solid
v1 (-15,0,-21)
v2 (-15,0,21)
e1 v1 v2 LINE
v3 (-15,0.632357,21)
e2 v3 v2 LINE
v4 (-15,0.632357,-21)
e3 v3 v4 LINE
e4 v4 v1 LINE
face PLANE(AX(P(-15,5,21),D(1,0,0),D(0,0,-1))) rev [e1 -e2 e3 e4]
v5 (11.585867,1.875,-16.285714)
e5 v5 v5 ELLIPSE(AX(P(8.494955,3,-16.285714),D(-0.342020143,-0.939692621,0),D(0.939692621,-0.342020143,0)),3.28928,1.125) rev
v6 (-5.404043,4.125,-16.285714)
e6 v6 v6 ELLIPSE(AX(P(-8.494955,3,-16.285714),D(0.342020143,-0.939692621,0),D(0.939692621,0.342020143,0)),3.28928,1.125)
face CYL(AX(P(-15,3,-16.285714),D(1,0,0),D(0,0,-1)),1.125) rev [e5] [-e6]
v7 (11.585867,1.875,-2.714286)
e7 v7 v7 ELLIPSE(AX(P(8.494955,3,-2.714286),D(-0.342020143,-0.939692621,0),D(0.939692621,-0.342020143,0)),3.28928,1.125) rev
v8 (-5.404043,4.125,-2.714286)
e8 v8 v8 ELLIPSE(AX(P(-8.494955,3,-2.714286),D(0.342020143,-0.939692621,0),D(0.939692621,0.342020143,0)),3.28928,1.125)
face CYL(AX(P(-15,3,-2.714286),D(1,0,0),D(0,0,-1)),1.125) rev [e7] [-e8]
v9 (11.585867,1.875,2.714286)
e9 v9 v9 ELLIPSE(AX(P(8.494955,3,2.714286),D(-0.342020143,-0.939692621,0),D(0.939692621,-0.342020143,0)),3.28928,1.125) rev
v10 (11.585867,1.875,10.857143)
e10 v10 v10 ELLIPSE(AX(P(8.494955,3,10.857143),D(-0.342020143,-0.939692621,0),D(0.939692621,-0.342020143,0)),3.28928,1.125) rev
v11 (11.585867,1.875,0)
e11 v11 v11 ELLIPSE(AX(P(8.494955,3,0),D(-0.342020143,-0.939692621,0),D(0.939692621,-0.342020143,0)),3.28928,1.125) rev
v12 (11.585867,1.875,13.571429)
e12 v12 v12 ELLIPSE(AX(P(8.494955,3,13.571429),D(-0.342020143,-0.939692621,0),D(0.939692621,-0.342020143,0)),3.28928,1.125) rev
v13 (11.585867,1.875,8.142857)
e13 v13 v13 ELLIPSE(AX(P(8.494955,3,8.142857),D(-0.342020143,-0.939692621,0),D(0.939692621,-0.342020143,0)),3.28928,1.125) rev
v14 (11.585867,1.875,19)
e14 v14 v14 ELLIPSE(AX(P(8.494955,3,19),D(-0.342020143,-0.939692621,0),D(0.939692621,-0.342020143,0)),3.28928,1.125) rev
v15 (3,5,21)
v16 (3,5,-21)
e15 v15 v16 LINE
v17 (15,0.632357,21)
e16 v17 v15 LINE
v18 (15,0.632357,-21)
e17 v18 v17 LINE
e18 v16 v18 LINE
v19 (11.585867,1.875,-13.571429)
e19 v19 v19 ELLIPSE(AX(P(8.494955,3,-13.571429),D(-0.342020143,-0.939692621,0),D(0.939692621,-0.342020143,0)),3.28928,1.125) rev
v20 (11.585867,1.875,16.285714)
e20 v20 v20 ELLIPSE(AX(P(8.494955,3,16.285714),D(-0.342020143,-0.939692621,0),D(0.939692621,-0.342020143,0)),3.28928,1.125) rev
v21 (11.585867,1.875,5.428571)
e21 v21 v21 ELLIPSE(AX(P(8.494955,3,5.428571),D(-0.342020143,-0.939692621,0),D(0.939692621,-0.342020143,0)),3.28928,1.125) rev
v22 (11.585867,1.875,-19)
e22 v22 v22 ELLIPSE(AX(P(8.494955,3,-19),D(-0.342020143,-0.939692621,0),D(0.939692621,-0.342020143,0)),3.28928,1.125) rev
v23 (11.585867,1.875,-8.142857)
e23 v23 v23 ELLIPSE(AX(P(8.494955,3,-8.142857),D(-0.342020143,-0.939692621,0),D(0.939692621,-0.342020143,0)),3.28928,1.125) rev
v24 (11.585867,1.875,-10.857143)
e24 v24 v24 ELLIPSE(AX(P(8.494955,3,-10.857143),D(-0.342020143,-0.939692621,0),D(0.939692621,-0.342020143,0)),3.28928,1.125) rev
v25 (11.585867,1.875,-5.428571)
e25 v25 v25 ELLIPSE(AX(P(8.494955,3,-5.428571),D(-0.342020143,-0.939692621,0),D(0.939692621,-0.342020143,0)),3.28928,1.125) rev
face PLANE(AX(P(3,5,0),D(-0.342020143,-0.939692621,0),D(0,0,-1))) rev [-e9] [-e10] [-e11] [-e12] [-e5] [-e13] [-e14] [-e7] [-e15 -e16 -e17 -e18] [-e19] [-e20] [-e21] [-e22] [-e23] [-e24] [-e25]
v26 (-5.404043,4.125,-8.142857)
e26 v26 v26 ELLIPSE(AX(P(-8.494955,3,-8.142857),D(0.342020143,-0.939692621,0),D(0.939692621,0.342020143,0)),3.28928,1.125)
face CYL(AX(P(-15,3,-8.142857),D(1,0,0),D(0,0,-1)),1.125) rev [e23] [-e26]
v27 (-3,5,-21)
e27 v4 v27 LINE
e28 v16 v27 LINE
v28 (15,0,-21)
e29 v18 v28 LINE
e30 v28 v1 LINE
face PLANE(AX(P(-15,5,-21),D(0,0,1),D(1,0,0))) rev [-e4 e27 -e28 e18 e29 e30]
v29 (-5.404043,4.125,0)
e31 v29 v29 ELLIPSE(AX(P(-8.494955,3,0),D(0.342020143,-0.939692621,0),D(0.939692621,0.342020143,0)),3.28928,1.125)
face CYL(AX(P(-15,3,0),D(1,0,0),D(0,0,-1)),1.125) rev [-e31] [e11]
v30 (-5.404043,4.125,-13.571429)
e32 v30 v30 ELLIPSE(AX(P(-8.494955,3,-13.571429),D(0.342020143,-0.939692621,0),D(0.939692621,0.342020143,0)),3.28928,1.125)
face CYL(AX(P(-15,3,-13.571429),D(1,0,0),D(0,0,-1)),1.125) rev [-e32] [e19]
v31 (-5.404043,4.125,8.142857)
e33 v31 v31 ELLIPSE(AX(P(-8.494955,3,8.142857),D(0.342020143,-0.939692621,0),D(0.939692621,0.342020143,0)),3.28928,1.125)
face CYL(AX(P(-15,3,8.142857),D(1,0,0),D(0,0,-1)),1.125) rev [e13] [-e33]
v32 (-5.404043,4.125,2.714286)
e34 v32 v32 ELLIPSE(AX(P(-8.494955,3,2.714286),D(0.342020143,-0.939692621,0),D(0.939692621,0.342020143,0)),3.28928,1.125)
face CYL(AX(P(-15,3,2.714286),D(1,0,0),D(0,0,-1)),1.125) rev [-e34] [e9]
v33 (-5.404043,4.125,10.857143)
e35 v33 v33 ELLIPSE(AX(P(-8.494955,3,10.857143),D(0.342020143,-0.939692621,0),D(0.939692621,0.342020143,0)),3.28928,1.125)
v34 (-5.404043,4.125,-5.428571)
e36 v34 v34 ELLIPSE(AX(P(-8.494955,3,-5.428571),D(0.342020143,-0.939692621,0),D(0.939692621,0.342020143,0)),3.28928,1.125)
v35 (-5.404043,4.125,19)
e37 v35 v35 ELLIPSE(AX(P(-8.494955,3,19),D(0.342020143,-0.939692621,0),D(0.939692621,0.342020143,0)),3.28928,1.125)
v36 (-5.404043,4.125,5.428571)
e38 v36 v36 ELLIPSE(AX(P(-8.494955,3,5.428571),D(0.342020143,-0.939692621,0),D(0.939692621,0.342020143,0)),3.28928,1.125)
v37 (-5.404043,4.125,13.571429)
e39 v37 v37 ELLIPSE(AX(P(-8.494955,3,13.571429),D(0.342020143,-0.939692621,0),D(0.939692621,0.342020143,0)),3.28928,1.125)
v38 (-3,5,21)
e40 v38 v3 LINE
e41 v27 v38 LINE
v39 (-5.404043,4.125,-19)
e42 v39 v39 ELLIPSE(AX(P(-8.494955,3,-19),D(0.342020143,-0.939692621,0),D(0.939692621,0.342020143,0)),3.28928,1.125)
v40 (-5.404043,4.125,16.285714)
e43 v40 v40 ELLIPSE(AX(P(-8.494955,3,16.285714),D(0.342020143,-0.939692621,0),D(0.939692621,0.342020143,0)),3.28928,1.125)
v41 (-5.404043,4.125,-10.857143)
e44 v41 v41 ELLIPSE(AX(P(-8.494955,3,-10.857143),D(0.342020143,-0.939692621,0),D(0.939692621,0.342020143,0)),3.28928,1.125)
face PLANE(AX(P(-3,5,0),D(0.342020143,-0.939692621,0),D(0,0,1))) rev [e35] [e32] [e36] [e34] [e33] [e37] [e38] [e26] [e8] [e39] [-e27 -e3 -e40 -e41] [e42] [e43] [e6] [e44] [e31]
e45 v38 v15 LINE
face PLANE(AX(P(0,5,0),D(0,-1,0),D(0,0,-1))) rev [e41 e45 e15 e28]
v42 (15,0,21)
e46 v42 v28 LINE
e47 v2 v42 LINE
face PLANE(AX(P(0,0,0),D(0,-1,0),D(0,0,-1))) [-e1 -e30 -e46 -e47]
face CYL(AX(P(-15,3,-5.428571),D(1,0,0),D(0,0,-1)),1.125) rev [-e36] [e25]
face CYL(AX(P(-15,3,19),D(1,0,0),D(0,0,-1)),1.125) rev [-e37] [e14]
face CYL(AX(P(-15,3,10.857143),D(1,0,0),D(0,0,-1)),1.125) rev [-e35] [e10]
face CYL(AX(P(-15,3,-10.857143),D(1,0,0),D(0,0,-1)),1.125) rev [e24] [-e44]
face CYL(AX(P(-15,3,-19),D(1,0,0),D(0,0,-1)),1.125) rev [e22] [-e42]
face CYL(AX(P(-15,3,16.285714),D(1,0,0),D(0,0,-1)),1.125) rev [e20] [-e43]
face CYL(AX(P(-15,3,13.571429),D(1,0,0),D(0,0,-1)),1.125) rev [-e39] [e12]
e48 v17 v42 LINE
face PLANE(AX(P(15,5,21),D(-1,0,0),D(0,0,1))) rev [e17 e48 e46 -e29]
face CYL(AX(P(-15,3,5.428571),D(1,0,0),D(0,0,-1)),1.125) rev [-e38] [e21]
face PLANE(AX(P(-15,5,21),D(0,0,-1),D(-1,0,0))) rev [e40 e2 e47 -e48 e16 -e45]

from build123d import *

# Parameters (mm, degrees)
SKETCH1_W           = 30
SKETCH1_H           = 42
BOSS_EXTRUDE1_DEPTH = 5
SKETCH2_R           = 1.125
CUT_EXTRUDE1_DEPTH  = 37.959437225
CHAMFER1_SIZE       = 4.367642811
CHAMFER1_SIZE_2     = 12
CHAMFER2_SIZE       = 12
CHAMFER2_SIZE_2     = 4.367642811


with BuildPart() as part:
    # Sketch1 → Boss-Extrude1 (new body)
    with BuildSketch(Plane(origin=(0, 0, 0), x_dir=(1, 0, 0), z_dir=(0, 1, 0))):
        Rectangle(SKETCH1_W, SKETCH1_H)
    extrude(amount=BOSS_EXTRUDE1_DEPTH)

    # Sketch2 → Cut-Extrude1 (cut, through all)
    with BuildSketch(Plane(origin=(15, 0, 0), x_dir=(0, 0, -1), z_dir=(1, 0, 0))):
        with Locations((-19, 3)):
            Circle(SKETCH2_R)
        with Locations((-16.285714286, 3)):
            Circle(SKETCH2_R)
        with Locations((-13.571428571, 3)):
            Circle(SKETCH2_R)
        with Locations((-10.857142857, 3)):
            Circle(SKETCH2_R)
        with Locations((-8.142857143, 3)):
            Circle(SKETCH2_R)
        with Locations((-5.428571429, 3)):
            Circle(SKETCH2_R)
        with Locations((-2.714285714, 3)):
            Circle(SKETCH2_R)
        with Locations((0, 3)):
            Circle(SKETCH2_R)
        with Locations((2.714285714, 3)):
            Circle(SKETCH2_R)
        with Locations((5.428571429, 3)):
            Circle(SKETCH2_R)
        with Locations((8.142857143, 3)):
            Circle(SKETCH2_R)
        with Locations((10.857142857, 3)):
            Circle(SKETCH2_R)
        with Locations((13.571428571, 3)):
            Circle(SKETCH2_R)
        with Locations((16.285714286, 3)):
            Circle(SKETCH2_R)
        with Locations((19, 3)):
            Circle(SKETCH2_R)
    extrude(amount=-CUT_EXTRUDE1_DEPTH, mode=Mode.SUBTRACT)

    # Chamfer1
    # the kernel refuses this chamfer: 12, 4.367642811 mm, written as the material it takes off along each edge
    with BuildSketch(Plane(origin=(15, 5, 52.130336791), x_dir=(0.09904090225204926, -0.9950833631817486, 0), z_dir=(0, 0, -1))) as chamfer1_piece_1:
        Polygon((CHAMFER1_SIZE * 0.995083363226, CHAMFER1_SIZE * 0.0990409022565), (-CHAMFER1_SIZE_2 * 0.099040902252, CHAMFER1_SIZE_2 * 0.995083363182), (0, 0), align=None)
    extrude(amount=104.260673581, mode=Mode.SUBTRACT)

    # Chamfer2
    # the kernel refuses this chamfer: 12, 4.367642811 mm, written as the material it takes off along each edge
    with BuildSketch(Plane(origin=(-15, 5, -52.130336791), x_dir=(0.9999130865277315, 0.013184058198645937, 0), z_dir=(0, 0, 1))) as chamfer2_piece_1:
        Polygon((CHAMFER2_SIZE * 0.999913086528, -CHAMFER2_SIZE * 0.0131840581986), (-CHAMFER2_SIZE_2 * 0.0131840581992, -CHAMFER2_SIZE_2 * 0.999913086572), (0, 0), align=None)
    extrude(amount=104.260673581, mode=Mode.SUBTRACT)


solid = part.part
